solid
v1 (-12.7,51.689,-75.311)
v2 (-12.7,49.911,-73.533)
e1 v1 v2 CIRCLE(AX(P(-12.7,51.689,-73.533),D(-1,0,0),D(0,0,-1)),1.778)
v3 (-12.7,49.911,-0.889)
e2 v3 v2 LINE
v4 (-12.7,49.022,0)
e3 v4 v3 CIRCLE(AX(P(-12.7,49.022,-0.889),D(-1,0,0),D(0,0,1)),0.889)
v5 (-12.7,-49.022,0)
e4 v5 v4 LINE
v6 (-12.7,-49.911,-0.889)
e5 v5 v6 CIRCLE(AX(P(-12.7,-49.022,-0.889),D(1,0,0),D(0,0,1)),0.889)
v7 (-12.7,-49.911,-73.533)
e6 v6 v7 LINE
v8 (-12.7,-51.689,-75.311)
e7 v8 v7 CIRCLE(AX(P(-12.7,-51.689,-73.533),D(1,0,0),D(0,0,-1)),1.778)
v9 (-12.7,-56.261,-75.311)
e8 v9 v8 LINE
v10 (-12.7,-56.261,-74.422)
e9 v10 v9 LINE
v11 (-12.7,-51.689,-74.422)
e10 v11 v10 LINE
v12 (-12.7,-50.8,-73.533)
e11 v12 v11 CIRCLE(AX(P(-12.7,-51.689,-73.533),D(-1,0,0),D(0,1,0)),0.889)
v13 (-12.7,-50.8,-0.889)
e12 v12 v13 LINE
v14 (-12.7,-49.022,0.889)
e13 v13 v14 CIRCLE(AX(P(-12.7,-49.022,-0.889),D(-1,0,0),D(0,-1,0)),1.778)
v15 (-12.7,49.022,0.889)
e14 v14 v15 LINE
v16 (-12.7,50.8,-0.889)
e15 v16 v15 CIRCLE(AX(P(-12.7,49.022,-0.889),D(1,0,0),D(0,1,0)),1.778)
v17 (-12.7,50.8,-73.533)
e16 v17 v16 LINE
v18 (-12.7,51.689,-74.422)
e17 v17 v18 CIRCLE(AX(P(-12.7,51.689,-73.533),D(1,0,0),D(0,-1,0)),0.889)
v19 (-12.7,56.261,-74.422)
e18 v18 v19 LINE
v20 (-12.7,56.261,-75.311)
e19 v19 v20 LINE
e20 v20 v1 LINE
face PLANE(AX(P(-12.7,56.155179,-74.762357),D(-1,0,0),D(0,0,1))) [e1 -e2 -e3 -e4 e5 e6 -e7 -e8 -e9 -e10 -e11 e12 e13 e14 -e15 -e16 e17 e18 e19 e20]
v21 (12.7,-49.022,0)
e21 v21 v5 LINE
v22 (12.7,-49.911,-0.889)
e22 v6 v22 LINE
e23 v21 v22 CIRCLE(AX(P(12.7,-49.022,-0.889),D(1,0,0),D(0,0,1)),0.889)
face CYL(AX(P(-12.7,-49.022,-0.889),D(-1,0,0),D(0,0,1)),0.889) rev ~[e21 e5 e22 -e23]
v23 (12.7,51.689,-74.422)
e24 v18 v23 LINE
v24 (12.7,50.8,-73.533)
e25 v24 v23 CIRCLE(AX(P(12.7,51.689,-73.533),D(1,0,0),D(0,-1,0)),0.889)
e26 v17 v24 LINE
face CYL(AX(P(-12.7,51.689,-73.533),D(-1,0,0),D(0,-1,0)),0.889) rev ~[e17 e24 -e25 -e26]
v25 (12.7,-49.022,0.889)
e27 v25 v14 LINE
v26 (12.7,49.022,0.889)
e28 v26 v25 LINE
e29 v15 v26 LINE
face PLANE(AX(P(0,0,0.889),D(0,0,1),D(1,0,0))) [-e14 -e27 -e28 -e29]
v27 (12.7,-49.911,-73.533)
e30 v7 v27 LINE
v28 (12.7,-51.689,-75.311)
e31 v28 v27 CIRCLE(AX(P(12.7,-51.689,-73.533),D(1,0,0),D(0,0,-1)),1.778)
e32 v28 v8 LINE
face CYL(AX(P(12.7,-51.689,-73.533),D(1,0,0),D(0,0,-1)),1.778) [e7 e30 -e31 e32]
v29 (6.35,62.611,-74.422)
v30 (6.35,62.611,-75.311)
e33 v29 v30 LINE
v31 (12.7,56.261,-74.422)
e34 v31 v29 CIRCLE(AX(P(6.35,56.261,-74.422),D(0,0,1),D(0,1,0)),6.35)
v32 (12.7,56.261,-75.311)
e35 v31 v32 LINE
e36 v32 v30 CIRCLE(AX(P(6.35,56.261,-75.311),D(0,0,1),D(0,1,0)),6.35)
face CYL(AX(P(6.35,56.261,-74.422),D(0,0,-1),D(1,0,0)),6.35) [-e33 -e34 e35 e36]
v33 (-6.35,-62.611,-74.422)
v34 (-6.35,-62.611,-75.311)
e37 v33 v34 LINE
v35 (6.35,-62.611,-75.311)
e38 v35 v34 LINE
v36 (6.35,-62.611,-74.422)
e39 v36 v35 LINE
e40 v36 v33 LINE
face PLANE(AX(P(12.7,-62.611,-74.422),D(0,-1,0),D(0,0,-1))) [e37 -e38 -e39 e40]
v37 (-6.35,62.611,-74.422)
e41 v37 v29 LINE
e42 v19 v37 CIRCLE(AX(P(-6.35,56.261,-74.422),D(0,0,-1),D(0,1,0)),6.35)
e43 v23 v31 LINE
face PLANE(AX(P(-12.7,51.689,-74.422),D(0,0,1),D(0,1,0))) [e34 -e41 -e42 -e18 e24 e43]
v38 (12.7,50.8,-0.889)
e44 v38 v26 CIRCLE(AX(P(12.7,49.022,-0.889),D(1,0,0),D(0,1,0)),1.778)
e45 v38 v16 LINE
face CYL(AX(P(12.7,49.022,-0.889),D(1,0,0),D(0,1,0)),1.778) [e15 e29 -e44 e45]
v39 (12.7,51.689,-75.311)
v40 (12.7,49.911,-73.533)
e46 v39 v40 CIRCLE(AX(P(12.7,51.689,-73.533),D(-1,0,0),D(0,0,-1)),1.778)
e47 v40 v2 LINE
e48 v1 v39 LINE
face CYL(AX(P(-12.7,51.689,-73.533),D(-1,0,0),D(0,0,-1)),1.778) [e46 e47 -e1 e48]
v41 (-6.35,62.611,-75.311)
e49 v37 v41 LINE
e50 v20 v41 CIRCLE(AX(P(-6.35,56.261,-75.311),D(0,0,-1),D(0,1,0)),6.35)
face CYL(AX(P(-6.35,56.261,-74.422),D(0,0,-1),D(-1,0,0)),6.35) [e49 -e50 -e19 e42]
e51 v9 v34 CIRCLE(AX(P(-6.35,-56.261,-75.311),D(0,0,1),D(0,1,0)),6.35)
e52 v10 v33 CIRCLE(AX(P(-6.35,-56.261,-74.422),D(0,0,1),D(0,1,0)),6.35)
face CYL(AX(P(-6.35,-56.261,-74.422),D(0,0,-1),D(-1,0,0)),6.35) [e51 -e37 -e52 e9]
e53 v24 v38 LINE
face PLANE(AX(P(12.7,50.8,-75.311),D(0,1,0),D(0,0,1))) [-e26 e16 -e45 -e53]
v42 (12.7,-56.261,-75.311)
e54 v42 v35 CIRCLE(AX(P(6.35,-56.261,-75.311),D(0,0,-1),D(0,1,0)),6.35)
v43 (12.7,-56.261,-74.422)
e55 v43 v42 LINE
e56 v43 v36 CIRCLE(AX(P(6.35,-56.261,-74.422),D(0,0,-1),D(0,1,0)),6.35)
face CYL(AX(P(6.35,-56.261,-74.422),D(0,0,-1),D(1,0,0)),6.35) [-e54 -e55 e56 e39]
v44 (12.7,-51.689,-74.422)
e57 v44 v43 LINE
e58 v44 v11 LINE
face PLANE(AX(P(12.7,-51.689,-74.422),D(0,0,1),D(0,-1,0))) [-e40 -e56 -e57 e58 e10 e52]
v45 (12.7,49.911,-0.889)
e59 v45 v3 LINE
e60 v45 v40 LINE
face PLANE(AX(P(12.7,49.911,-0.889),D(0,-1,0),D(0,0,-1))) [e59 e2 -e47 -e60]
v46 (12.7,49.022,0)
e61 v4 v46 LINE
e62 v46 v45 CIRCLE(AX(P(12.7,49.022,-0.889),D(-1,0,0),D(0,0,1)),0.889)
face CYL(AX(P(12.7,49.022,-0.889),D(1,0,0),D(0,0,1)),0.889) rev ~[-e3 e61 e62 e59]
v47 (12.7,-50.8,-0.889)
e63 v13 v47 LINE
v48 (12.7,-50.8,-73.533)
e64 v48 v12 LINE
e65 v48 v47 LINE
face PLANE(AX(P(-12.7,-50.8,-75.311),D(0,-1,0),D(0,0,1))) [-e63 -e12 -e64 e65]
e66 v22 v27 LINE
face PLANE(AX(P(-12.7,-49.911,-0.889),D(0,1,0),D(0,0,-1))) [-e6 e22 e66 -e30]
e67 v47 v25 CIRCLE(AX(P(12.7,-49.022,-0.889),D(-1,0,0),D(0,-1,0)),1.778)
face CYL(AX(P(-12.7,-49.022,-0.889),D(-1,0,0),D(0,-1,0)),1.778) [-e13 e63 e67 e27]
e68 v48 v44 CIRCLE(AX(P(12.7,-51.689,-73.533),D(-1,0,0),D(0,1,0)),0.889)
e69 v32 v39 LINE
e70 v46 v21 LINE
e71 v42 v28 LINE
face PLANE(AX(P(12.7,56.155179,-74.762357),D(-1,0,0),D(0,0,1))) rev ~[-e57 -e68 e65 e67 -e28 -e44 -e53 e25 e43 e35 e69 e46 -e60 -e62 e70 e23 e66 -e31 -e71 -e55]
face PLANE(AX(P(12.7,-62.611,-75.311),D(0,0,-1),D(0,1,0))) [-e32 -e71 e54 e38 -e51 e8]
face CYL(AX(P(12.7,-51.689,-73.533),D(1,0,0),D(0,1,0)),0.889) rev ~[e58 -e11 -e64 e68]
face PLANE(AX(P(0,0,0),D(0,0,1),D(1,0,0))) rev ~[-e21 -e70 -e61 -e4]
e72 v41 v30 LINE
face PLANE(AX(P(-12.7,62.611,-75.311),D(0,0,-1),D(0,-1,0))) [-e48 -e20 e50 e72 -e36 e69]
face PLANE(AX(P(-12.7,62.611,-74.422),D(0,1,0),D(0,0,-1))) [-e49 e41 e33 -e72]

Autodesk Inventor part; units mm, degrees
ref_plane "YZ Plane" through (0, 0, 0) normal (1, 0, 0) x (0, 1, 0)
ref_plane "XZ Plane" through (0, 0, 0) normal (0, 1, 0) x (-1, 0, 0)
ref_plane "XY Plane" through (0, 0, 0) normal (0, 0, 1) x (1, 0, 0)
sketch "Sketch1" plane through (0, 0, 0) normal (0, 0, 1) x (1, 0, 0)
  line L0 (12.7, -50.8) -> (-12.7, -50.8)
  line L1 (-12.7, -50.8) -> (-12.7, 50.8)
  line L2 (-12.7, 50.8) -> (12.7, 50.8)
  line L3 (12.7, 50.8) -> (12.7, -50.8)
  line L4 (12.7, -50.8) -> (-12.7, 50.8) construction
  line L5 (-12.7, -50.8) -> (12.7, 50.8) construction
  point P0 (0, 0)
  dimension "d0" = 25.4
  dimension "d1" = 101.6
extrude "Plate1" add sketch "Sketch1" along normal blind 0.889
sketch "Sketch2" plane through (12.7, 49.911, 0.889) normal (0, 1, 0) x (-1, 0, 0)
  line L0 (25.4, 0) -> (0, 0)
  line L1 (0, 0) -> (0, -76.2)
  line L2 (0, -76.2) -> (25.4, -76.2)
  line L3 (25.4, -76.2) -> (25.4, 0)
edge flange "Flange1" height 76.2 angle 90 thickness 0.889 bend radius 0.889 thickness toward (0, 1, 0) relief straight relief width 0.889 relief depth 0.4445 corner gap 0.889 corner form 0 edges at (0, 50.8, 0) (0, -50.8, 0) wall of the first edge with corners at (-12.7, 49.911, 0.889) (12.7, 49.911, 0.889) (12.7, 49.911, -75.311) (-12.7, 49.911, -75.311)
bend "Bend1"
corner "Corner1"
sketch "Sketch3" plane through (-12.7, 49.911, -74.422) normal (0, 0, -1) x (-1, 0, 0)
  line L0 (-25.4, 0) -> (0, 0)
  line L1 (0, 0) -> (0, 12.7)
  line L2 (0, 12.7) -> (-25.4, 12.7)
  line L3 (-25.4, 12.7) -> (-25.4, 0)
edge flange "Flange2" height 12.7 angle 90 thickness 0.889 bend radius 0.889 thickness toward (0, 0, -1) relief straight relief width 0.889 relief depth 0.4445 corner gap 0.889 corner form 0 edges at (0, 50.8, -75.311) (0, -50.8, -75.311) wall of the first edge with corners at (12.7, 49.911, -74.422) (-12.7, 49.911, -74.422) (-12.7, 62.611, -74.422) (12.7, 62.611, -74.422)
bend "Bend2"
corner "Corner2"
fillet "Corner Round1" radius 6.35 4 edges at (-12.7, 62.611, -74.8665) (12.7, 62.611, -74.8665) (-12.7, -62.611, -74.8665) (12.7, -62.611, -74.8665)
equation "\"d2\" = Thickness"
equation "\"d3\" = BendReliefWidth"
equation "\"d4\" = BendReliefDepth"
equation "\"d5\" = MinimumRemnant"
equation "\"d6\" = TransitionRadius"
equation "\"d9\" = BendRadius"
equation "\"d10\" = CornerReliefSize"
equation "\"d11\" = GapSize"
equation "\"d12\" = JacobiRadiusSize"
equation "\"d13\" = BendReliefWidth"
equation "\"d14\" = BendReliefDepth"
equation "\"d15\" = MinimumRemnant"
equation "\"d16\" = TransitionRadius"
equation "\"d19\" = BendRadius"
equation "\"d20\" = CornerReliefSize"
equation "\"d21\" = GapSize"
equation "\"d22\" = JacobiRadiusSize"
equation "\"BendRadius\" = Thickness"
equation "\"BendReliefWidth\" = Thickness"
equation "\"BendReliefDepth\" = 0.5 * Thickness"
equation "\"CornerReliefSize\" = 4 * Thickness"
equation "\"MinimumRemnant\" = 2 * Thickness"
equation "\"TransitionRadius\" = BendRadius"
equation "\"JacobiRadiusSize\" = Thickness"
equation "\"GapSize\" = Thickness"
equation "\"Thickness\" = 0.889"
properties part number "Handle" material "Aluminum 6061"
